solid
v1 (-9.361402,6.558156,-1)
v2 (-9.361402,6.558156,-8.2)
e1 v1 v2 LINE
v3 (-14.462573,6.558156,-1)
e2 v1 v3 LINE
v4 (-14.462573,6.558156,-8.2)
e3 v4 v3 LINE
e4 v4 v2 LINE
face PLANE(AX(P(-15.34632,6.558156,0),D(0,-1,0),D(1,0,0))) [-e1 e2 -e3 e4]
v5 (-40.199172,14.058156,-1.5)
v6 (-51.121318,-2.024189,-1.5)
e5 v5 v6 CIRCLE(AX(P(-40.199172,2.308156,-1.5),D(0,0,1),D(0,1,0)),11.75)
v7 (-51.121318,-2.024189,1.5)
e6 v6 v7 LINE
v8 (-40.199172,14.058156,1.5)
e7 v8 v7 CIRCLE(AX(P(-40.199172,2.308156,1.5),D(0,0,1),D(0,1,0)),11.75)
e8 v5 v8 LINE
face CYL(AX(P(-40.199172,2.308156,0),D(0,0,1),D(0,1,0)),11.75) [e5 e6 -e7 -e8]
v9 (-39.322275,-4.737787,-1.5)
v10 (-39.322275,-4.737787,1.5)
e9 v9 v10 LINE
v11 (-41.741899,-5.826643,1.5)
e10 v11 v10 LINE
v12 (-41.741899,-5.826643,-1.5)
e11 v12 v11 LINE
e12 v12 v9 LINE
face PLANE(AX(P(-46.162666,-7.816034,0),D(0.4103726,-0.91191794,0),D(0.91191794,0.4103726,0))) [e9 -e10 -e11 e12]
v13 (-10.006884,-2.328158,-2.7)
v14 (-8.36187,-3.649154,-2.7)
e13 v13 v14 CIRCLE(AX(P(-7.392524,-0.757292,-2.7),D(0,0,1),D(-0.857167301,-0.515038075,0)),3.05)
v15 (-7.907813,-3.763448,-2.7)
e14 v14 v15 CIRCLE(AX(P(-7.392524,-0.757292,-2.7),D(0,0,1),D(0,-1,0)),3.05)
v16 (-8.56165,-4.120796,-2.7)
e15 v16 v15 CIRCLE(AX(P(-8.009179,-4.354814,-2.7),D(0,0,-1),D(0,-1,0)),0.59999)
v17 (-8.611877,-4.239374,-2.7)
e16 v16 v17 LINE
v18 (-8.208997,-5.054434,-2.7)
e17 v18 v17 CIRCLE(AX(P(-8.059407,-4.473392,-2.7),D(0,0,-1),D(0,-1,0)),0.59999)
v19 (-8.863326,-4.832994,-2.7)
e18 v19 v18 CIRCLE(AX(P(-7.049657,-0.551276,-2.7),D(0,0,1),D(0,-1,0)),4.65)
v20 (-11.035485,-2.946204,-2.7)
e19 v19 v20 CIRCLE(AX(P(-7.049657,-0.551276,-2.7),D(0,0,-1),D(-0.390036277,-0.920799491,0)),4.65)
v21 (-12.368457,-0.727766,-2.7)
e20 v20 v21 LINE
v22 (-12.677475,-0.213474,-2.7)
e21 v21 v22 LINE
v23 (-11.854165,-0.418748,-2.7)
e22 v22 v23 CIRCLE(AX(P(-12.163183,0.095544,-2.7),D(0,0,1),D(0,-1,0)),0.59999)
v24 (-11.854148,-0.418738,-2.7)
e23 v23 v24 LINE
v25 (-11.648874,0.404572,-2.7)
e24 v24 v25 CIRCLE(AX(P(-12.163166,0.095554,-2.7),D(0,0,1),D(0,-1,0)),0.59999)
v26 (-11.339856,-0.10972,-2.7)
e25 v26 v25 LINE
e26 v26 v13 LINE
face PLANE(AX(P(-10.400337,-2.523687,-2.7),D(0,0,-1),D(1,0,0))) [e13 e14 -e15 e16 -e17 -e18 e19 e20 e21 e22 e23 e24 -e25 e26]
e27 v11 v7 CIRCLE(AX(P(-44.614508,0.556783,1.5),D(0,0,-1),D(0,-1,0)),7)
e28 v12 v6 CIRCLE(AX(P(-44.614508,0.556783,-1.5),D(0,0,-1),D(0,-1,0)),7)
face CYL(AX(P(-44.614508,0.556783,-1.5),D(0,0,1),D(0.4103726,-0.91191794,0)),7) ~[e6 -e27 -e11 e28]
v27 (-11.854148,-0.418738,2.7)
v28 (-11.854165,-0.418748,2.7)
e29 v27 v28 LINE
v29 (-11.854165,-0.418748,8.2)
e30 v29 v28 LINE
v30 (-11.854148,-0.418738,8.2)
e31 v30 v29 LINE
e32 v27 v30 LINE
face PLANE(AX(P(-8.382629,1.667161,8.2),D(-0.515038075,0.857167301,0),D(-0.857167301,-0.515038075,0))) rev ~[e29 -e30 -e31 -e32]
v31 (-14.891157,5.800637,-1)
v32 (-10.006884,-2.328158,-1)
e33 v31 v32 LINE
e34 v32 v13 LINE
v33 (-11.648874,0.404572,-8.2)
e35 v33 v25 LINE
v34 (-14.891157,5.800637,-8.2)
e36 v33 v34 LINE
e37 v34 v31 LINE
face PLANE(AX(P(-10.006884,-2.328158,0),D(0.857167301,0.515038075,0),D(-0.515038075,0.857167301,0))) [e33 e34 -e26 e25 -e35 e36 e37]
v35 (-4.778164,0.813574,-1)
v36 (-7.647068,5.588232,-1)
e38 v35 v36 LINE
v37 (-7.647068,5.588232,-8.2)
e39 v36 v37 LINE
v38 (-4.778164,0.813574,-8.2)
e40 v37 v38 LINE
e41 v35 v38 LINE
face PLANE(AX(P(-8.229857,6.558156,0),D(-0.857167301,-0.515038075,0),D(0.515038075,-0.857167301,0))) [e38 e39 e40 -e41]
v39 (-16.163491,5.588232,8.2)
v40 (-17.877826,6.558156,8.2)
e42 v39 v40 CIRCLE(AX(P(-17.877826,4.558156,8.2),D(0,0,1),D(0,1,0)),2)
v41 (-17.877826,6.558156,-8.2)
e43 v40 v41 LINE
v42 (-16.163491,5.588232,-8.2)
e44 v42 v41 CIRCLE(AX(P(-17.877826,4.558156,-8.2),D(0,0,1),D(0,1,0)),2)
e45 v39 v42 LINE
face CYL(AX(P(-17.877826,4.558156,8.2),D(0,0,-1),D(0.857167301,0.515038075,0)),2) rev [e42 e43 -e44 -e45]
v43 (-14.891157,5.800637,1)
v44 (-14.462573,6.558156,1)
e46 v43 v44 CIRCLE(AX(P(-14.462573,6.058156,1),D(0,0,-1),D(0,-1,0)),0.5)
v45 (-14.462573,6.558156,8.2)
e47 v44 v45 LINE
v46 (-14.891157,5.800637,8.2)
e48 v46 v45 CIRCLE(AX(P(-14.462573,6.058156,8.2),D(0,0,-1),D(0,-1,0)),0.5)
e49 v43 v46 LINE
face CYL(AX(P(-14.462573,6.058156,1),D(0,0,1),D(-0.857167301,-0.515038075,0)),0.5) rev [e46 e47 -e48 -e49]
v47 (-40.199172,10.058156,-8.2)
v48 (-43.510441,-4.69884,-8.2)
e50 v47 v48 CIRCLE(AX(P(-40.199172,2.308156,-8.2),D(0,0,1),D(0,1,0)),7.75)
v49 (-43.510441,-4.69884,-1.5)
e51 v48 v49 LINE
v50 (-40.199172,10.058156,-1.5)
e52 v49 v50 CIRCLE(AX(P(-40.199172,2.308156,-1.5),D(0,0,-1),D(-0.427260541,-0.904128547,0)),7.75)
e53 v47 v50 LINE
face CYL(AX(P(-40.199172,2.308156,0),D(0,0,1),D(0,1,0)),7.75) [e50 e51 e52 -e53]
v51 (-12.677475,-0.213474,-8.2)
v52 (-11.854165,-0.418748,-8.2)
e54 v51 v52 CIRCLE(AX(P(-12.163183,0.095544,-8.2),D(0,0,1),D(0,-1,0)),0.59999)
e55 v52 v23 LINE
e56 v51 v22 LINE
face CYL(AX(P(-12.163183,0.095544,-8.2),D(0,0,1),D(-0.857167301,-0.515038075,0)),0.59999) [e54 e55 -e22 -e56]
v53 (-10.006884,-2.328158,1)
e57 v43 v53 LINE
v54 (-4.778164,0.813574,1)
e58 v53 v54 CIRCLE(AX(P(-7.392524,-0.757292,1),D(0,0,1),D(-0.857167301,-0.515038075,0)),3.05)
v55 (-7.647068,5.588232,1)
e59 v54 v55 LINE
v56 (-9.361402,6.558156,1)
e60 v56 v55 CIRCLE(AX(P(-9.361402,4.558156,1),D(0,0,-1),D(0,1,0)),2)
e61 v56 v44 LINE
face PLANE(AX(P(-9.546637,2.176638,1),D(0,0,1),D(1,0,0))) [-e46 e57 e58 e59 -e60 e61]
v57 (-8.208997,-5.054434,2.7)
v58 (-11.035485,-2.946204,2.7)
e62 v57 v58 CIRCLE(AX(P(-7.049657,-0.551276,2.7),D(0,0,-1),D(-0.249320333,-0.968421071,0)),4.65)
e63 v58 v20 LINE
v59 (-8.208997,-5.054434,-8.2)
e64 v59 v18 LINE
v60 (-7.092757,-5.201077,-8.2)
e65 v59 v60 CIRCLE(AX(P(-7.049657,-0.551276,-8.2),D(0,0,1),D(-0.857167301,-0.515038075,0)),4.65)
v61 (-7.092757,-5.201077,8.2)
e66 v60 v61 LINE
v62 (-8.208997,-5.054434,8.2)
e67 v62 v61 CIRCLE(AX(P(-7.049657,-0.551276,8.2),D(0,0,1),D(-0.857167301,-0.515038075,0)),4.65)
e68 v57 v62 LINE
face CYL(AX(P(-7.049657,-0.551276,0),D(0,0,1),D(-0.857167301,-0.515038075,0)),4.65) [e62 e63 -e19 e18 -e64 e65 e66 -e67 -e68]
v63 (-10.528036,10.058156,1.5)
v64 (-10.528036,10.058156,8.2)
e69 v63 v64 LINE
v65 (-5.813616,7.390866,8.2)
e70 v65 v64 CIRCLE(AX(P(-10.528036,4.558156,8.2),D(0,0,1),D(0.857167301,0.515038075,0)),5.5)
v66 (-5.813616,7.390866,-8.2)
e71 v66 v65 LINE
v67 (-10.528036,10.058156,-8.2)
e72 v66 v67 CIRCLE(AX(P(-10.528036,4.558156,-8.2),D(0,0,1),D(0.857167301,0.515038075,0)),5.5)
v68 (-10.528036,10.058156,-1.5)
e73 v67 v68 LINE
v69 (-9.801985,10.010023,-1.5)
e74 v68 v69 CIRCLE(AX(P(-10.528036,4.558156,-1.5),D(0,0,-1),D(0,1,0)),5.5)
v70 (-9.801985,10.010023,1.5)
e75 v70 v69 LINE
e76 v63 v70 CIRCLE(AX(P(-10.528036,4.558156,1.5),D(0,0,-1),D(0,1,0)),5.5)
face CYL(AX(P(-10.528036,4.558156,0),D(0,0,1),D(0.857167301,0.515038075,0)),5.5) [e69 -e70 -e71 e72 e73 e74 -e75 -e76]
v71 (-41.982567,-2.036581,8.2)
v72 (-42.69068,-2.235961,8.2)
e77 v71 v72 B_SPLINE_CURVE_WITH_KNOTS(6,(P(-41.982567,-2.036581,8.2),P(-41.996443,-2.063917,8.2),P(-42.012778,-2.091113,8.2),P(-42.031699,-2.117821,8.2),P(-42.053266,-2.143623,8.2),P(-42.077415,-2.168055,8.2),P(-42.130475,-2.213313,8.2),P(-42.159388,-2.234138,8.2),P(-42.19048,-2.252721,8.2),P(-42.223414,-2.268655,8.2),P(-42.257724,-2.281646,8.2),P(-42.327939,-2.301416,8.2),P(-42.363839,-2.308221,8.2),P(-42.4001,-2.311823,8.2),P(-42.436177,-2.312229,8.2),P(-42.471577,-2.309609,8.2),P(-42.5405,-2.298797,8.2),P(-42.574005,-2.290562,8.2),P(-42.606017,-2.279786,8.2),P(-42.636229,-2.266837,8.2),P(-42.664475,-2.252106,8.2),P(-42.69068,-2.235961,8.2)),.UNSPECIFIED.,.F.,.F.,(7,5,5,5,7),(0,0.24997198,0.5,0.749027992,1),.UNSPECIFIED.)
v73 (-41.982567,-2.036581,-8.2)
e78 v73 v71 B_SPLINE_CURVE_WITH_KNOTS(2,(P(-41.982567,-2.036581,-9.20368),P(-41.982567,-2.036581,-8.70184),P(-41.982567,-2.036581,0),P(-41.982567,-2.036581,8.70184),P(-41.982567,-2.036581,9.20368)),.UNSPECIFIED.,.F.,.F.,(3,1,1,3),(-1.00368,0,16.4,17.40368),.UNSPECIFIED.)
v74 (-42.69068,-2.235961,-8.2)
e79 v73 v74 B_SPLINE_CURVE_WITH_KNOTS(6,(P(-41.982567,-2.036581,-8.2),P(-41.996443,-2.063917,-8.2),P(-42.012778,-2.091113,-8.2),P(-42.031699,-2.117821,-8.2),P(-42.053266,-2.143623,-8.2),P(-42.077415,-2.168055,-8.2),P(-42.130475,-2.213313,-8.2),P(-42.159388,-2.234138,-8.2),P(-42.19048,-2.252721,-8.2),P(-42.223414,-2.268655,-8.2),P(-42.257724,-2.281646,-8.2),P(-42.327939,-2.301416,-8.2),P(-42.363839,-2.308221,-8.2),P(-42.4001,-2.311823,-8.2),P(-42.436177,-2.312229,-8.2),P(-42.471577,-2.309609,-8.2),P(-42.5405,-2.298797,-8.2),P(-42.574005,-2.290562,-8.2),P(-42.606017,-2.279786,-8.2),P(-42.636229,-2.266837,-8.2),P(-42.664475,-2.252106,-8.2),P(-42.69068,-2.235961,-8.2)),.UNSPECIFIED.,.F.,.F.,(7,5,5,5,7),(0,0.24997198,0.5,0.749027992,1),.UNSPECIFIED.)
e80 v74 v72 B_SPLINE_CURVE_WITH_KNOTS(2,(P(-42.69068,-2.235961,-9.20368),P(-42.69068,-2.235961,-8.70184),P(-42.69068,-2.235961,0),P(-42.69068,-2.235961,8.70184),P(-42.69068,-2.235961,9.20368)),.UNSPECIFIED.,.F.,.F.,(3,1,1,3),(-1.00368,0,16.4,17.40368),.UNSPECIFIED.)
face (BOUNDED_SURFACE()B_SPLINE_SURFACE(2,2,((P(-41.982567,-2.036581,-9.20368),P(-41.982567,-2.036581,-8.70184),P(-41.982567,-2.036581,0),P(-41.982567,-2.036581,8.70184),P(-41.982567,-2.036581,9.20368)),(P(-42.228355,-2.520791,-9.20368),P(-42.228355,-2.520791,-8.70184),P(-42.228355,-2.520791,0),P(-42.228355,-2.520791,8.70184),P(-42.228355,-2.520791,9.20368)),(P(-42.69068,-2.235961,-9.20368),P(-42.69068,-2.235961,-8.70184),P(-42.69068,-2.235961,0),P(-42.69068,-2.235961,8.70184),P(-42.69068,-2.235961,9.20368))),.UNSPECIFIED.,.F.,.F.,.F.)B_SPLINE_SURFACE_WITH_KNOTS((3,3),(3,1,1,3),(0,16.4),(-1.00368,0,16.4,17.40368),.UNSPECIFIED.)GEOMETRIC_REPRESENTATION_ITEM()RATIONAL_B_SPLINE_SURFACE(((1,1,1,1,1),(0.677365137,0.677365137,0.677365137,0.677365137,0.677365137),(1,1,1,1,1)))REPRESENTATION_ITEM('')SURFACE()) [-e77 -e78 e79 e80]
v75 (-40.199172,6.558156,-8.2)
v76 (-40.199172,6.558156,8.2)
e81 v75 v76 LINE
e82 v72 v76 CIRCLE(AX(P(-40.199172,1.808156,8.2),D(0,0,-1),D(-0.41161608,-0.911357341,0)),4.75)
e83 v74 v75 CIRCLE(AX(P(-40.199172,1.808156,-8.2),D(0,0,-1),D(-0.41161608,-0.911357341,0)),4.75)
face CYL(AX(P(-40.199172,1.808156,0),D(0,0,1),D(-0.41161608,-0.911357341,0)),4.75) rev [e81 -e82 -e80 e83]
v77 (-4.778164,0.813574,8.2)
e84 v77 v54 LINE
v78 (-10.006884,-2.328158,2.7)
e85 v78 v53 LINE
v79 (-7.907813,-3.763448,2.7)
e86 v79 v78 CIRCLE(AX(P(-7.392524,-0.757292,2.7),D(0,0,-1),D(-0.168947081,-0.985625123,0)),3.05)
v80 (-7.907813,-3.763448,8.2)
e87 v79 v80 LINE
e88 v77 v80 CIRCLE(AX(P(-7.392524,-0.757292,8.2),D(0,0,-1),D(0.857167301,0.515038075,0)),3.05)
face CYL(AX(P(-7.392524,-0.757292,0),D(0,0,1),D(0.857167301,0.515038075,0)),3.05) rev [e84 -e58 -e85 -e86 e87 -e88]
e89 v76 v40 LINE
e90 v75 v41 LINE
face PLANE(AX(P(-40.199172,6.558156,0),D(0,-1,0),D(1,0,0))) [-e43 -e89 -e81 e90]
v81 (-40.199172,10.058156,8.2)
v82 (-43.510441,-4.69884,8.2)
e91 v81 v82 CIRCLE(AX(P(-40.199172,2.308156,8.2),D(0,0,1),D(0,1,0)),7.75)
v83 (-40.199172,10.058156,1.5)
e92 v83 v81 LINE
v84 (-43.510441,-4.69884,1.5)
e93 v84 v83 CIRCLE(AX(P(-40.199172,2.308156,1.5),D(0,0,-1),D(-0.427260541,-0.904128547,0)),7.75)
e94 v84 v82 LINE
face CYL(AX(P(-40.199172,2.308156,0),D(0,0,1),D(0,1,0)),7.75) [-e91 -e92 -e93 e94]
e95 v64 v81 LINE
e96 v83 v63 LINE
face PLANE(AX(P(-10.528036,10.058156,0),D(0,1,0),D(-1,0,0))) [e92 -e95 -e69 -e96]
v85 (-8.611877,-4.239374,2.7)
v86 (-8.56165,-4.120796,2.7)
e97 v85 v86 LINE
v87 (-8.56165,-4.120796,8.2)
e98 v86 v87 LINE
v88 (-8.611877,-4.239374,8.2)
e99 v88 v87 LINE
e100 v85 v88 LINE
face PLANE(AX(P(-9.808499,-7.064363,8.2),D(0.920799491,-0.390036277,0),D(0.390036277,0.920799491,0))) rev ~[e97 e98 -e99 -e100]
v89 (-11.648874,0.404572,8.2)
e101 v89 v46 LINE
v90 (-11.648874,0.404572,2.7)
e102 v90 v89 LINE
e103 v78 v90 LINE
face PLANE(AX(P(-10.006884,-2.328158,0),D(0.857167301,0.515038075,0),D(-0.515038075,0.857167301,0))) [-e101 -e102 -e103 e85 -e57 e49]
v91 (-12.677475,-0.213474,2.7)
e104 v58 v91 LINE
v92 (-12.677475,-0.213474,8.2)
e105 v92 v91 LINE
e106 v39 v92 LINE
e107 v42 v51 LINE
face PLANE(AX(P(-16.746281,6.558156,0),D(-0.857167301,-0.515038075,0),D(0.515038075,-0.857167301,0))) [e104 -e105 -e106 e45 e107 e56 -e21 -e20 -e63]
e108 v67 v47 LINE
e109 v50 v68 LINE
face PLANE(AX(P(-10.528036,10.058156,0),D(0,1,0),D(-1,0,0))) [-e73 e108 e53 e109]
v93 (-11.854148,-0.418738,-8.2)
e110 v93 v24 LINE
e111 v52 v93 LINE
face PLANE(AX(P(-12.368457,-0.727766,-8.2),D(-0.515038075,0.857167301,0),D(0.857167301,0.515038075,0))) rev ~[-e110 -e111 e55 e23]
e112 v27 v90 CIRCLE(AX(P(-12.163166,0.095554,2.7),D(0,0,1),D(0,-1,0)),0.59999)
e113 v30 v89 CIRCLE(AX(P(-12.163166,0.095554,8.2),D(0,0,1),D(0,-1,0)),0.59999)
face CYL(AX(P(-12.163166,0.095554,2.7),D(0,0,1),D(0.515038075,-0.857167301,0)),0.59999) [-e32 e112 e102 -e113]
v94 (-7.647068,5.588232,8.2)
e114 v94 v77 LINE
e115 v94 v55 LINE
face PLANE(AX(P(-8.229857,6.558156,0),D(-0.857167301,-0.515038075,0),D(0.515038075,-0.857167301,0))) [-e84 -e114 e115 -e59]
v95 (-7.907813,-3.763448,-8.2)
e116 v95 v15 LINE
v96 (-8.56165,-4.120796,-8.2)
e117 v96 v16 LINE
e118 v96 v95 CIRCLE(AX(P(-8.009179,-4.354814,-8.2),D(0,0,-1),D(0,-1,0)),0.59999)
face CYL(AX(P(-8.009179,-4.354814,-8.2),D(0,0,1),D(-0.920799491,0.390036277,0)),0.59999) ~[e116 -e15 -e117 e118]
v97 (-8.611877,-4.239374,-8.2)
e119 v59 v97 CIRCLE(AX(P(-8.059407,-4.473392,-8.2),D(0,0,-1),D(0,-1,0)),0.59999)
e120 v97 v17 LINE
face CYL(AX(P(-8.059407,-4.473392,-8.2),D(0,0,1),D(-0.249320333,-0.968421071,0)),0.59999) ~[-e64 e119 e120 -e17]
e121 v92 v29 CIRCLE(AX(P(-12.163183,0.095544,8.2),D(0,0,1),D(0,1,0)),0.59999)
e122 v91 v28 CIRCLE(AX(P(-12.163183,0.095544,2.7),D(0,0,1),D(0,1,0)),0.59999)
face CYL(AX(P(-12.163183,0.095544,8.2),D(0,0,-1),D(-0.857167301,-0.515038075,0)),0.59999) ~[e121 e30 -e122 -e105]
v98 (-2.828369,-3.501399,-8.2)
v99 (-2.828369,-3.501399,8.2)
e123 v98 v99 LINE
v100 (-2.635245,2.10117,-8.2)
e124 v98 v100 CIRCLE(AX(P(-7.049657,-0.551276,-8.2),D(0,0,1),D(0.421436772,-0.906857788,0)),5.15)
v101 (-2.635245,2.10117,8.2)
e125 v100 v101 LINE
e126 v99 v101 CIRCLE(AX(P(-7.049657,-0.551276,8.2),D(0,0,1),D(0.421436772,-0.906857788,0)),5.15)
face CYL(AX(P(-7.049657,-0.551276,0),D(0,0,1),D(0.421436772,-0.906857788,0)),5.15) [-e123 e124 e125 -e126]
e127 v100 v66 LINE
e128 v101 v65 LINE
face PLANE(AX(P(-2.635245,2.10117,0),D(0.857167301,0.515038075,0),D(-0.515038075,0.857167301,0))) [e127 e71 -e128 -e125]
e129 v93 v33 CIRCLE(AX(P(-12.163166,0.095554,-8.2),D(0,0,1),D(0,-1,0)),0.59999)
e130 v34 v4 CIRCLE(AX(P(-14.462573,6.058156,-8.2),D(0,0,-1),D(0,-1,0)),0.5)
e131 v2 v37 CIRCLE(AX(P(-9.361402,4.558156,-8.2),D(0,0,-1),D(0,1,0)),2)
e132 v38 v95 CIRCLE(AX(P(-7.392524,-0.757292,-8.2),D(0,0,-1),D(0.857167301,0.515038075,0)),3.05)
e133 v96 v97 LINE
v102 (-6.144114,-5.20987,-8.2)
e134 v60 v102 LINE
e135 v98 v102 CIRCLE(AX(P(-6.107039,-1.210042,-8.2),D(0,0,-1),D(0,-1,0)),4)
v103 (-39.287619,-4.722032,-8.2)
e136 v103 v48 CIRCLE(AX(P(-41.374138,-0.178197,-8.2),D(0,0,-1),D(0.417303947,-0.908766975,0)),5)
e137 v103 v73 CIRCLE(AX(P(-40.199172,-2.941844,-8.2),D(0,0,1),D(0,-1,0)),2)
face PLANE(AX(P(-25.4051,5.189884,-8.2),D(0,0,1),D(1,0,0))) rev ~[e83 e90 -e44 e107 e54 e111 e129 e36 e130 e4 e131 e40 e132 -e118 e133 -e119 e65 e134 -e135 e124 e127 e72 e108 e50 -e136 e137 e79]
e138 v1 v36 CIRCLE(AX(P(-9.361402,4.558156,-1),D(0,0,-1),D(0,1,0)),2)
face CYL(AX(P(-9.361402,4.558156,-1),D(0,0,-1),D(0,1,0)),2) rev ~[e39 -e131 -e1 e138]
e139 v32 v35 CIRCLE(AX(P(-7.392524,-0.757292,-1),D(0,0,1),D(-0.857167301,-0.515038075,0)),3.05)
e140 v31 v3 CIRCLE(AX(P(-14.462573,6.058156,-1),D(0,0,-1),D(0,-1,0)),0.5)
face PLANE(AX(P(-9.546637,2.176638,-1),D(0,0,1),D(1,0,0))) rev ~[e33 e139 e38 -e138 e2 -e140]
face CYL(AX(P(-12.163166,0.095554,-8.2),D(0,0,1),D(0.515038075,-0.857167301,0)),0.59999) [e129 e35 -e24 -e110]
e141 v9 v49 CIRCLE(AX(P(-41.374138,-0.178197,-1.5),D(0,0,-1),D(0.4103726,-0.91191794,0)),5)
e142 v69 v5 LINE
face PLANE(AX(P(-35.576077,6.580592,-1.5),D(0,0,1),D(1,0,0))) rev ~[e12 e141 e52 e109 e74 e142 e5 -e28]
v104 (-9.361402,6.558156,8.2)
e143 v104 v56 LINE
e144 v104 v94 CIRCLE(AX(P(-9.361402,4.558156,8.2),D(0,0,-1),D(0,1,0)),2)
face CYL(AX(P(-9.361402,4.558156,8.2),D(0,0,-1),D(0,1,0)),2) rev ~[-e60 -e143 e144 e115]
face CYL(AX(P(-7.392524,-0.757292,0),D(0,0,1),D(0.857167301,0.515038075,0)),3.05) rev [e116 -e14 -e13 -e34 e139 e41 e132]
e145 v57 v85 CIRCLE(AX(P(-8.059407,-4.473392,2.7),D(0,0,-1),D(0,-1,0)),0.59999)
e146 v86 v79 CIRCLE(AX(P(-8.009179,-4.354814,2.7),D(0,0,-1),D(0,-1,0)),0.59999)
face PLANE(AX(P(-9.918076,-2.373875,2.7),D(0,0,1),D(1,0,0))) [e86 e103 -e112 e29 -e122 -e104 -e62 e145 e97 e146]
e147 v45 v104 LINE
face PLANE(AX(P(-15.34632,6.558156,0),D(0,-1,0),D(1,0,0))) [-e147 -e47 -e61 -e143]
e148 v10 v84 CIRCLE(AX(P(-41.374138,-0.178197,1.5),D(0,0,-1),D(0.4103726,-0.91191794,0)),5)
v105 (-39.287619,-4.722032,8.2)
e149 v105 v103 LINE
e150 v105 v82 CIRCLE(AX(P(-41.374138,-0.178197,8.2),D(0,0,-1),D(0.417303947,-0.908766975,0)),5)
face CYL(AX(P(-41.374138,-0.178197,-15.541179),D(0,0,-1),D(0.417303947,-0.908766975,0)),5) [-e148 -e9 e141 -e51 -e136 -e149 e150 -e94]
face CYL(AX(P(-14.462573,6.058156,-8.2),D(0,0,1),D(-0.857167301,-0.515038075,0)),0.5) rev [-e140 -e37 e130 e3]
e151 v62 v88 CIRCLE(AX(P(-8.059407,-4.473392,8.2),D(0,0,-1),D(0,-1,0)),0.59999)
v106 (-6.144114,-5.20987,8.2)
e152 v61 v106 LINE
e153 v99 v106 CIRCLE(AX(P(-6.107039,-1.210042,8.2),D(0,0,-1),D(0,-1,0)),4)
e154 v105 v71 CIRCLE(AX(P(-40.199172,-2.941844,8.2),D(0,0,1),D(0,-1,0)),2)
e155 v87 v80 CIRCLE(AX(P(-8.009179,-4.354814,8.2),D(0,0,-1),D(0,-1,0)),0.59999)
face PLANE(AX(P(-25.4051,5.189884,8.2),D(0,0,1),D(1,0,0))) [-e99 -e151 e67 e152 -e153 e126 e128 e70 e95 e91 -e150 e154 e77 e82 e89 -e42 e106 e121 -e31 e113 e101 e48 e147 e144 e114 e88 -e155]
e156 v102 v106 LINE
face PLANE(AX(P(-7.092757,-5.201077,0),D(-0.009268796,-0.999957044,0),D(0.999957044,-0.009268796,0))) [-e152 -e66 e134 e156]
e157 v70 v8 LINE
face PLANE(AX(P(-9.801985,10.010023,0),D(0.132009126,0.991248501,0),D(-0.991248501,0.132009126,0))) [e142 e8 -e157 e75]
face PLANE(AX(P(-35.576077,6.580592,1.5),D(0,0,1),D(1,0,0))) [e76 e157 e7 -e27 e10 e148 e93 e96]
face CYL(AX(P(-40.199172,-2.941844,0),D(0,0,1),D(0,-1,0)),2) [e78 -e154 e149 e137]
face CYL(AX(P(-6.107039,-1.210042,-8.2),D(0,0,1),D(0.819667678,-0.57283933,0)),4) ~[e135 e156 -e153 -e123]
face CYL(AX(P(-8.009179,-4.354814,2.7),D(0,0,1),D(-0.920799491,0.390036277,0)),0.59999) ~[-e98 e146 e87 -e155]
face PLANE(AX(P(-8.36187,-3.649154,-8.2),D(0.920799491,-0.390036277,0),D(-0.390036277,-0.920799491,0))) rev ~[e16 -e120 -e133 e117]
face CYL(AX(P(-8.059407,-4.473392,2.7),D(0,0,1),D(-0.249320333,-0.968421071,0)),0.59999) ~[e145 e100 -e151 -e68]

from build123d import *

# Parameters (mm, degrees)
F1_DEPTH    = 8.2
F2_DEPTH    = 1
F4_DEPTH    = 5.5
F15_DEPTH   = 5.5
F5_R        = 2
F16_R       = 0.5
F17_R       = 2
F18_R       = 5
F19_R       = 0.5
F6_R        = 0.59999
F8_DEPTH    = 8.2
F9_T1_DEPTH = 31.0823571676
F10_R       = 4
F12_DEPTH   = 1.5
F13_R       = 7


# Not quite as in the source:
# - a fillet or chamfer that OpenCascade refuses, or shapes differently, is made with other operations: its cross-section is extruded or revolved along the edge and cut away or added
# - a fillet or chamfer is up to 0.001 mm smaller than in the source, because OpenCascade refuses the exact size


with BuildPart() as f1:
    # F0 (on Top) → F1 (new body, symmetric)
    with BuildSketch(Plane.XY):
        with BuildLine():
            Line((-7.6991717756, 9.5581562555), (-40.1991717756, 9.5581562555))
            ThreePointArc((-40.1991717756, 9.5581562555), (-47.4491717756, 2.3081562555), (-40.1991717756, -4.9418437445))
            ThreePointArc((-40.1991717756, -4.9418437445), (-38.6431985652, -1.6852820196), (-42.1543481568, -2.5207911129))
            ThreePointArc((-42.1543481568, -2.5207911129), (-44.8427156809, 2.8081562555), (-40.1991717756, 6.5581562555))
            Line((-40.1991717756, 6.5581562555), (-16.7462805126, 6.5581562555))
            Line((-16.7462805126, 6.5581562555), (-11.035484998, -2.9462035475))
            ThreePointArc((-11.035484998, -2.9462035475), (-4.6547300014, -4.5371044474), (-3.0638291014, 1.8436505492))
            Line((-3.0638291014, 1.8436505492), (-7.6991717756, 9.5581562555))
        make_face()
        with BuildLine():
            Line((-15.346320436, 6.5581562555), (-8.229856713, 6.5581562555))
            Line((-8.229856713, 6.5581562555), (-4.7781637028, 0.8135743994))
            ThreePointArc((-4.7781637028, 0.8135743994), (-5.8216578415, -3.3716519963), (-10.0068842371, -2.3281578576))
            Line((-10.0068842371, -2.3281578576), (-15.346320436, 6.5581562555))
        make_face(mode=Mode.SUBTRACT)
    extrude(amount=F1_DEPTH, both=True)

    # F0 (on Top) → F2 (join, symmetric)
    with BuildSketch(Plane.XY):
        with BuildLine():
            Line((-4.7781637028, 0.8135743994), (-8.229856713, 6.5581562555))
            Line((-8.229856713, 6.5581562555), (-15.346320436, 6.5581562555))
            Line((-15.346320436, 6.5581562555), (-10.0068842371, -2.3281578576))
            ThreePointArc((-10.0068842371, -2.3281578576), (-5.8216578415, -3.3716519963), (-4.7781637028, 0.8135743994))
        make_face()
    extrude(amount=F2_DEPTH, both=True)

    # F3 (on face) → F4 (cut)
    with BuildSketch(Plane.XY.offset(8.2)):
        Polygon((-9.8084988335, -7.0643632576), (-7.0496570497, -0.5512764992), (-8.3826289276, 1.6671612479), (-13.2850058391, -1.2784839779), align=None)
    extrude(amount=-F4_DEPTH, mode=Mode.SUBTRACT)

    # F14 (on face) → F15 (cut)
    with BuildSketch(Plane(origin=(0, 0, -8.2), x_dir=(1, 0, 0), z_dir=(0, 0, -1))):
        with BuildLine():
            Line((-12.3684568759, 0.7277658005), (-11.3398561151, 0.1097201106))
            Line((-11.3398561151, 0.1097201106), (-10.0068842371, 2.3281578576))
            ThreePointArc((-10.0068842371, 2.3281578576), (-9.3022346771, 3.1354223006), (-8.3618696665, 3.649154264))
            Line((-8.3618696665, 3.649154264), (-8.8633257373, 4.8329941325))
            ThreePointArc((-8.8633257373, 4.8329941325), (-10.099006978, 4.0618270279), (-11.035484998, 2.9462035475))
            Line((-11.035484998, 2.9462035475), (-12.3684568759, 0.7277658005))
        make_face()
    extrude(amount=-F15_DEPTH, mode=Mode.SUBTRACT)

    # F5
    f5_edges = [f1.edges().sort_by_distance(p)[0] for p in [
        (-16.746281, 6.558156, 0),
    ]]
    fillet(f5_edges, radius=F5_R)

    # F16
    f16_edges = [f1.edges().sort_by_distance(p)[0] for p in [
        (-15.34632, 6.558156, -4.6),
        (-15.34632, 6.558156, 4.6),
    ]]
    fillet(f16_edges, radius=F16_R)

    # F17
    f17_edges = [f1.edges().sort_by_distance(p)[0] for p in [
        (-8.229857, 6.558156, -4.6),
        (-8.229857, 6.558156, 4.6),
    ]]
    fillet(f17_edges, radius=F17_R)

    # F18
    f18_edges = [f1.edges().sort_by_distance(p)[0] for p in [
        (-7.699172, 9.558156, 0),
    ]]
    fillet(f18_edges, radius=F18_R)

    # F19
    f19_edges = [f1.edges().sort_by_distance(p)[0] for p in [
        (-42.154348, -2.520791, 0),
    ]]
    fillet(f19_edges, radius=F19_R)

    # F6 (radius 0.6 in the source; OpenCascade refuses exactly that, so slightly less here)
    f6_edges = [f1.edges().sort_by_distance(p)[0] for p in [
        (-12.368457, -0.727766, 5.45),
        (-11.339856, -0.10972, 5.45),
        (-8.36187, -3.649154, 5.45),
        (-8.863326, -4.832994, 5.45),
        (-8.863326, -4.832994, -5.45),
        (-8.36187, -3.649154, -5.45),
        (-12.368457, -0.727766, -5.45),
        (-11.339856, -0.10972, -5.45),
    ]]
    fillet(f6_edges, radius=F6_R)

    # F7 (on Top) → F8 (join, symmetric)
    with BuildSketch(Plane.XY):
        with BuildLine():
            ThreePointArc((-40.1991717756, -4.9418437445), (-47.4491717756, 2.3081562555), (-40.1991717756, 9.5581562555))
            Line((-40.1991717756, 9.5581562555), (-10.5280356666, 9.5581562555))
            ThreePointArc((-10.5280356666, 9.5581562555), (-8.065917866, 8.9099347352), (-6.242199163, 7.13334663))
            Line((-6.242199163, 7.13334663), (-3.0638291014, 1.8436505492))
            ThreePointArc((-3.0638291014, 1.8436505492), (-3.0131583432, -2.8597777863), (-7.0927569488, -5.2010767528))
            Line((-7.0927569488, -5.2010767528), (-4.8792576743, -5.2215941063))
            ThreePointArc((-4.8792576743, -5.2215941063), (-2.1256697511, -2.0601996528), (-2.6352454511, 2.1011695866))
            Line((-2.6352454511, 2.1011695866), (-5.8136155127, 7.3908656675))
            ThreePointArc((-5.8136155127, 7.3908656675), (-7.819706086, 9.3451125832), (-10.5280356666, 10.0581562555))
            Line((-10.5280356666, 10.0581562555), (-40.1991717756, 10.0581562555))
            ThreePointArc((-40.1991717756, 10.0581562555), (-47.9456545804, 2.5416175049), (-40.6658823702, -5.4277781561))
            Line((-40.6658823702, -5.4277781561), (-39.2876185276, -4.7220321267))
            ThreePointArc((-39.2876185276, -4.7220321267), (-39.7303310587, -4.8861144001), (-40.1991717756, -4.9418437445))
        make_face()
    extrude(amount=F8_DEPTH, both=True)

    # F9: fillet of radius 5 on 1 edges, made by hand

    # F9_s2 → F9_t1 (cut)
    with BuildSketch(Plane.XY.offset(-15.5411785838)):
        with BuildLine():
            ThreePointArc((-39.2876185276, -4.7220321267), (-41.4015983231, -5.1781218435), (-43.5104409693, -4.6988399859))
            Line((-43.5104409693, -4.6988399859), (-43.5531670234, -4.7892528406))
            ThreePointArc((-43.5531670234, -4.7892528406), (-42.1478250371, -5.2961353267), (-40.6719044424, -5.5275966647))
            Line((-40.6719044424, -5.5275966647), (-40.6203047078, -5.5167875752))
            ThreePointArc((-40.6203047078, -5.5167875752), (-39.9311727865, -5.1639145605), (-39.2458881329, -4.8129088242))
            Line((-39.2458881329, -4.8129088242), (-39.2876185276, -4.7220321267))
        make_face()
    extrude(amount=F9_T1_DEPTH, mode=Mode.SUBTRACT)

    # F10
    f10_edges = [f1.edges().sort_by_distance(p)[0] for p in [
        (-4.879258, -5.221594, 0),
    ]]
    fillet(f10_edges, radius=F10_R)

    # F11 (on Top) → F12 (join, symmetric)
    with BuildSketch(Plane.XY):
        with BuildLine():
            Line((-9.8019854711, 10.0100230104), (-40.1991717756, 14.0581562555))
            ThreePointArc((-40.1991717756, 14.0581562555), (-51.5354352526, 5.3987274618), (-46.1626661567, -7.8160343179))
            Line((-46.1626661567, -7.8160343179), (-39.3222752617, -4.7377869483))
            ThreePointArc((-39.3222752617, -4.7377869483), (-41.4206326973, -5.1779810716), (-43.5104409693, -4.6988399859))
            ThreePointArc((-43.5104409693, -4.6988399859), (-47.7611398022, 4.0049590032), (-40.1991717756, 10.0581562555))
            Line((-40.1991717756, 10.0581562555), (-10.5280356666, 10.0581562555))
            ThreePointArc((-10.5280356666, 10.0581562555), (-10.1642136992, 10.0461097517), (-9.8019854711, 10.0100230104))
        make_face()
    extrude(amount=F12_DEPTH, both=True)

    # F13
    f13_edges = [f1.edges().sort_by_distance(p)[0] for p in [
        (-46.162666, -7.816034, 0),
    ]]
    fillet(f13_edges, radius=F13_R)


solid = f1.part
